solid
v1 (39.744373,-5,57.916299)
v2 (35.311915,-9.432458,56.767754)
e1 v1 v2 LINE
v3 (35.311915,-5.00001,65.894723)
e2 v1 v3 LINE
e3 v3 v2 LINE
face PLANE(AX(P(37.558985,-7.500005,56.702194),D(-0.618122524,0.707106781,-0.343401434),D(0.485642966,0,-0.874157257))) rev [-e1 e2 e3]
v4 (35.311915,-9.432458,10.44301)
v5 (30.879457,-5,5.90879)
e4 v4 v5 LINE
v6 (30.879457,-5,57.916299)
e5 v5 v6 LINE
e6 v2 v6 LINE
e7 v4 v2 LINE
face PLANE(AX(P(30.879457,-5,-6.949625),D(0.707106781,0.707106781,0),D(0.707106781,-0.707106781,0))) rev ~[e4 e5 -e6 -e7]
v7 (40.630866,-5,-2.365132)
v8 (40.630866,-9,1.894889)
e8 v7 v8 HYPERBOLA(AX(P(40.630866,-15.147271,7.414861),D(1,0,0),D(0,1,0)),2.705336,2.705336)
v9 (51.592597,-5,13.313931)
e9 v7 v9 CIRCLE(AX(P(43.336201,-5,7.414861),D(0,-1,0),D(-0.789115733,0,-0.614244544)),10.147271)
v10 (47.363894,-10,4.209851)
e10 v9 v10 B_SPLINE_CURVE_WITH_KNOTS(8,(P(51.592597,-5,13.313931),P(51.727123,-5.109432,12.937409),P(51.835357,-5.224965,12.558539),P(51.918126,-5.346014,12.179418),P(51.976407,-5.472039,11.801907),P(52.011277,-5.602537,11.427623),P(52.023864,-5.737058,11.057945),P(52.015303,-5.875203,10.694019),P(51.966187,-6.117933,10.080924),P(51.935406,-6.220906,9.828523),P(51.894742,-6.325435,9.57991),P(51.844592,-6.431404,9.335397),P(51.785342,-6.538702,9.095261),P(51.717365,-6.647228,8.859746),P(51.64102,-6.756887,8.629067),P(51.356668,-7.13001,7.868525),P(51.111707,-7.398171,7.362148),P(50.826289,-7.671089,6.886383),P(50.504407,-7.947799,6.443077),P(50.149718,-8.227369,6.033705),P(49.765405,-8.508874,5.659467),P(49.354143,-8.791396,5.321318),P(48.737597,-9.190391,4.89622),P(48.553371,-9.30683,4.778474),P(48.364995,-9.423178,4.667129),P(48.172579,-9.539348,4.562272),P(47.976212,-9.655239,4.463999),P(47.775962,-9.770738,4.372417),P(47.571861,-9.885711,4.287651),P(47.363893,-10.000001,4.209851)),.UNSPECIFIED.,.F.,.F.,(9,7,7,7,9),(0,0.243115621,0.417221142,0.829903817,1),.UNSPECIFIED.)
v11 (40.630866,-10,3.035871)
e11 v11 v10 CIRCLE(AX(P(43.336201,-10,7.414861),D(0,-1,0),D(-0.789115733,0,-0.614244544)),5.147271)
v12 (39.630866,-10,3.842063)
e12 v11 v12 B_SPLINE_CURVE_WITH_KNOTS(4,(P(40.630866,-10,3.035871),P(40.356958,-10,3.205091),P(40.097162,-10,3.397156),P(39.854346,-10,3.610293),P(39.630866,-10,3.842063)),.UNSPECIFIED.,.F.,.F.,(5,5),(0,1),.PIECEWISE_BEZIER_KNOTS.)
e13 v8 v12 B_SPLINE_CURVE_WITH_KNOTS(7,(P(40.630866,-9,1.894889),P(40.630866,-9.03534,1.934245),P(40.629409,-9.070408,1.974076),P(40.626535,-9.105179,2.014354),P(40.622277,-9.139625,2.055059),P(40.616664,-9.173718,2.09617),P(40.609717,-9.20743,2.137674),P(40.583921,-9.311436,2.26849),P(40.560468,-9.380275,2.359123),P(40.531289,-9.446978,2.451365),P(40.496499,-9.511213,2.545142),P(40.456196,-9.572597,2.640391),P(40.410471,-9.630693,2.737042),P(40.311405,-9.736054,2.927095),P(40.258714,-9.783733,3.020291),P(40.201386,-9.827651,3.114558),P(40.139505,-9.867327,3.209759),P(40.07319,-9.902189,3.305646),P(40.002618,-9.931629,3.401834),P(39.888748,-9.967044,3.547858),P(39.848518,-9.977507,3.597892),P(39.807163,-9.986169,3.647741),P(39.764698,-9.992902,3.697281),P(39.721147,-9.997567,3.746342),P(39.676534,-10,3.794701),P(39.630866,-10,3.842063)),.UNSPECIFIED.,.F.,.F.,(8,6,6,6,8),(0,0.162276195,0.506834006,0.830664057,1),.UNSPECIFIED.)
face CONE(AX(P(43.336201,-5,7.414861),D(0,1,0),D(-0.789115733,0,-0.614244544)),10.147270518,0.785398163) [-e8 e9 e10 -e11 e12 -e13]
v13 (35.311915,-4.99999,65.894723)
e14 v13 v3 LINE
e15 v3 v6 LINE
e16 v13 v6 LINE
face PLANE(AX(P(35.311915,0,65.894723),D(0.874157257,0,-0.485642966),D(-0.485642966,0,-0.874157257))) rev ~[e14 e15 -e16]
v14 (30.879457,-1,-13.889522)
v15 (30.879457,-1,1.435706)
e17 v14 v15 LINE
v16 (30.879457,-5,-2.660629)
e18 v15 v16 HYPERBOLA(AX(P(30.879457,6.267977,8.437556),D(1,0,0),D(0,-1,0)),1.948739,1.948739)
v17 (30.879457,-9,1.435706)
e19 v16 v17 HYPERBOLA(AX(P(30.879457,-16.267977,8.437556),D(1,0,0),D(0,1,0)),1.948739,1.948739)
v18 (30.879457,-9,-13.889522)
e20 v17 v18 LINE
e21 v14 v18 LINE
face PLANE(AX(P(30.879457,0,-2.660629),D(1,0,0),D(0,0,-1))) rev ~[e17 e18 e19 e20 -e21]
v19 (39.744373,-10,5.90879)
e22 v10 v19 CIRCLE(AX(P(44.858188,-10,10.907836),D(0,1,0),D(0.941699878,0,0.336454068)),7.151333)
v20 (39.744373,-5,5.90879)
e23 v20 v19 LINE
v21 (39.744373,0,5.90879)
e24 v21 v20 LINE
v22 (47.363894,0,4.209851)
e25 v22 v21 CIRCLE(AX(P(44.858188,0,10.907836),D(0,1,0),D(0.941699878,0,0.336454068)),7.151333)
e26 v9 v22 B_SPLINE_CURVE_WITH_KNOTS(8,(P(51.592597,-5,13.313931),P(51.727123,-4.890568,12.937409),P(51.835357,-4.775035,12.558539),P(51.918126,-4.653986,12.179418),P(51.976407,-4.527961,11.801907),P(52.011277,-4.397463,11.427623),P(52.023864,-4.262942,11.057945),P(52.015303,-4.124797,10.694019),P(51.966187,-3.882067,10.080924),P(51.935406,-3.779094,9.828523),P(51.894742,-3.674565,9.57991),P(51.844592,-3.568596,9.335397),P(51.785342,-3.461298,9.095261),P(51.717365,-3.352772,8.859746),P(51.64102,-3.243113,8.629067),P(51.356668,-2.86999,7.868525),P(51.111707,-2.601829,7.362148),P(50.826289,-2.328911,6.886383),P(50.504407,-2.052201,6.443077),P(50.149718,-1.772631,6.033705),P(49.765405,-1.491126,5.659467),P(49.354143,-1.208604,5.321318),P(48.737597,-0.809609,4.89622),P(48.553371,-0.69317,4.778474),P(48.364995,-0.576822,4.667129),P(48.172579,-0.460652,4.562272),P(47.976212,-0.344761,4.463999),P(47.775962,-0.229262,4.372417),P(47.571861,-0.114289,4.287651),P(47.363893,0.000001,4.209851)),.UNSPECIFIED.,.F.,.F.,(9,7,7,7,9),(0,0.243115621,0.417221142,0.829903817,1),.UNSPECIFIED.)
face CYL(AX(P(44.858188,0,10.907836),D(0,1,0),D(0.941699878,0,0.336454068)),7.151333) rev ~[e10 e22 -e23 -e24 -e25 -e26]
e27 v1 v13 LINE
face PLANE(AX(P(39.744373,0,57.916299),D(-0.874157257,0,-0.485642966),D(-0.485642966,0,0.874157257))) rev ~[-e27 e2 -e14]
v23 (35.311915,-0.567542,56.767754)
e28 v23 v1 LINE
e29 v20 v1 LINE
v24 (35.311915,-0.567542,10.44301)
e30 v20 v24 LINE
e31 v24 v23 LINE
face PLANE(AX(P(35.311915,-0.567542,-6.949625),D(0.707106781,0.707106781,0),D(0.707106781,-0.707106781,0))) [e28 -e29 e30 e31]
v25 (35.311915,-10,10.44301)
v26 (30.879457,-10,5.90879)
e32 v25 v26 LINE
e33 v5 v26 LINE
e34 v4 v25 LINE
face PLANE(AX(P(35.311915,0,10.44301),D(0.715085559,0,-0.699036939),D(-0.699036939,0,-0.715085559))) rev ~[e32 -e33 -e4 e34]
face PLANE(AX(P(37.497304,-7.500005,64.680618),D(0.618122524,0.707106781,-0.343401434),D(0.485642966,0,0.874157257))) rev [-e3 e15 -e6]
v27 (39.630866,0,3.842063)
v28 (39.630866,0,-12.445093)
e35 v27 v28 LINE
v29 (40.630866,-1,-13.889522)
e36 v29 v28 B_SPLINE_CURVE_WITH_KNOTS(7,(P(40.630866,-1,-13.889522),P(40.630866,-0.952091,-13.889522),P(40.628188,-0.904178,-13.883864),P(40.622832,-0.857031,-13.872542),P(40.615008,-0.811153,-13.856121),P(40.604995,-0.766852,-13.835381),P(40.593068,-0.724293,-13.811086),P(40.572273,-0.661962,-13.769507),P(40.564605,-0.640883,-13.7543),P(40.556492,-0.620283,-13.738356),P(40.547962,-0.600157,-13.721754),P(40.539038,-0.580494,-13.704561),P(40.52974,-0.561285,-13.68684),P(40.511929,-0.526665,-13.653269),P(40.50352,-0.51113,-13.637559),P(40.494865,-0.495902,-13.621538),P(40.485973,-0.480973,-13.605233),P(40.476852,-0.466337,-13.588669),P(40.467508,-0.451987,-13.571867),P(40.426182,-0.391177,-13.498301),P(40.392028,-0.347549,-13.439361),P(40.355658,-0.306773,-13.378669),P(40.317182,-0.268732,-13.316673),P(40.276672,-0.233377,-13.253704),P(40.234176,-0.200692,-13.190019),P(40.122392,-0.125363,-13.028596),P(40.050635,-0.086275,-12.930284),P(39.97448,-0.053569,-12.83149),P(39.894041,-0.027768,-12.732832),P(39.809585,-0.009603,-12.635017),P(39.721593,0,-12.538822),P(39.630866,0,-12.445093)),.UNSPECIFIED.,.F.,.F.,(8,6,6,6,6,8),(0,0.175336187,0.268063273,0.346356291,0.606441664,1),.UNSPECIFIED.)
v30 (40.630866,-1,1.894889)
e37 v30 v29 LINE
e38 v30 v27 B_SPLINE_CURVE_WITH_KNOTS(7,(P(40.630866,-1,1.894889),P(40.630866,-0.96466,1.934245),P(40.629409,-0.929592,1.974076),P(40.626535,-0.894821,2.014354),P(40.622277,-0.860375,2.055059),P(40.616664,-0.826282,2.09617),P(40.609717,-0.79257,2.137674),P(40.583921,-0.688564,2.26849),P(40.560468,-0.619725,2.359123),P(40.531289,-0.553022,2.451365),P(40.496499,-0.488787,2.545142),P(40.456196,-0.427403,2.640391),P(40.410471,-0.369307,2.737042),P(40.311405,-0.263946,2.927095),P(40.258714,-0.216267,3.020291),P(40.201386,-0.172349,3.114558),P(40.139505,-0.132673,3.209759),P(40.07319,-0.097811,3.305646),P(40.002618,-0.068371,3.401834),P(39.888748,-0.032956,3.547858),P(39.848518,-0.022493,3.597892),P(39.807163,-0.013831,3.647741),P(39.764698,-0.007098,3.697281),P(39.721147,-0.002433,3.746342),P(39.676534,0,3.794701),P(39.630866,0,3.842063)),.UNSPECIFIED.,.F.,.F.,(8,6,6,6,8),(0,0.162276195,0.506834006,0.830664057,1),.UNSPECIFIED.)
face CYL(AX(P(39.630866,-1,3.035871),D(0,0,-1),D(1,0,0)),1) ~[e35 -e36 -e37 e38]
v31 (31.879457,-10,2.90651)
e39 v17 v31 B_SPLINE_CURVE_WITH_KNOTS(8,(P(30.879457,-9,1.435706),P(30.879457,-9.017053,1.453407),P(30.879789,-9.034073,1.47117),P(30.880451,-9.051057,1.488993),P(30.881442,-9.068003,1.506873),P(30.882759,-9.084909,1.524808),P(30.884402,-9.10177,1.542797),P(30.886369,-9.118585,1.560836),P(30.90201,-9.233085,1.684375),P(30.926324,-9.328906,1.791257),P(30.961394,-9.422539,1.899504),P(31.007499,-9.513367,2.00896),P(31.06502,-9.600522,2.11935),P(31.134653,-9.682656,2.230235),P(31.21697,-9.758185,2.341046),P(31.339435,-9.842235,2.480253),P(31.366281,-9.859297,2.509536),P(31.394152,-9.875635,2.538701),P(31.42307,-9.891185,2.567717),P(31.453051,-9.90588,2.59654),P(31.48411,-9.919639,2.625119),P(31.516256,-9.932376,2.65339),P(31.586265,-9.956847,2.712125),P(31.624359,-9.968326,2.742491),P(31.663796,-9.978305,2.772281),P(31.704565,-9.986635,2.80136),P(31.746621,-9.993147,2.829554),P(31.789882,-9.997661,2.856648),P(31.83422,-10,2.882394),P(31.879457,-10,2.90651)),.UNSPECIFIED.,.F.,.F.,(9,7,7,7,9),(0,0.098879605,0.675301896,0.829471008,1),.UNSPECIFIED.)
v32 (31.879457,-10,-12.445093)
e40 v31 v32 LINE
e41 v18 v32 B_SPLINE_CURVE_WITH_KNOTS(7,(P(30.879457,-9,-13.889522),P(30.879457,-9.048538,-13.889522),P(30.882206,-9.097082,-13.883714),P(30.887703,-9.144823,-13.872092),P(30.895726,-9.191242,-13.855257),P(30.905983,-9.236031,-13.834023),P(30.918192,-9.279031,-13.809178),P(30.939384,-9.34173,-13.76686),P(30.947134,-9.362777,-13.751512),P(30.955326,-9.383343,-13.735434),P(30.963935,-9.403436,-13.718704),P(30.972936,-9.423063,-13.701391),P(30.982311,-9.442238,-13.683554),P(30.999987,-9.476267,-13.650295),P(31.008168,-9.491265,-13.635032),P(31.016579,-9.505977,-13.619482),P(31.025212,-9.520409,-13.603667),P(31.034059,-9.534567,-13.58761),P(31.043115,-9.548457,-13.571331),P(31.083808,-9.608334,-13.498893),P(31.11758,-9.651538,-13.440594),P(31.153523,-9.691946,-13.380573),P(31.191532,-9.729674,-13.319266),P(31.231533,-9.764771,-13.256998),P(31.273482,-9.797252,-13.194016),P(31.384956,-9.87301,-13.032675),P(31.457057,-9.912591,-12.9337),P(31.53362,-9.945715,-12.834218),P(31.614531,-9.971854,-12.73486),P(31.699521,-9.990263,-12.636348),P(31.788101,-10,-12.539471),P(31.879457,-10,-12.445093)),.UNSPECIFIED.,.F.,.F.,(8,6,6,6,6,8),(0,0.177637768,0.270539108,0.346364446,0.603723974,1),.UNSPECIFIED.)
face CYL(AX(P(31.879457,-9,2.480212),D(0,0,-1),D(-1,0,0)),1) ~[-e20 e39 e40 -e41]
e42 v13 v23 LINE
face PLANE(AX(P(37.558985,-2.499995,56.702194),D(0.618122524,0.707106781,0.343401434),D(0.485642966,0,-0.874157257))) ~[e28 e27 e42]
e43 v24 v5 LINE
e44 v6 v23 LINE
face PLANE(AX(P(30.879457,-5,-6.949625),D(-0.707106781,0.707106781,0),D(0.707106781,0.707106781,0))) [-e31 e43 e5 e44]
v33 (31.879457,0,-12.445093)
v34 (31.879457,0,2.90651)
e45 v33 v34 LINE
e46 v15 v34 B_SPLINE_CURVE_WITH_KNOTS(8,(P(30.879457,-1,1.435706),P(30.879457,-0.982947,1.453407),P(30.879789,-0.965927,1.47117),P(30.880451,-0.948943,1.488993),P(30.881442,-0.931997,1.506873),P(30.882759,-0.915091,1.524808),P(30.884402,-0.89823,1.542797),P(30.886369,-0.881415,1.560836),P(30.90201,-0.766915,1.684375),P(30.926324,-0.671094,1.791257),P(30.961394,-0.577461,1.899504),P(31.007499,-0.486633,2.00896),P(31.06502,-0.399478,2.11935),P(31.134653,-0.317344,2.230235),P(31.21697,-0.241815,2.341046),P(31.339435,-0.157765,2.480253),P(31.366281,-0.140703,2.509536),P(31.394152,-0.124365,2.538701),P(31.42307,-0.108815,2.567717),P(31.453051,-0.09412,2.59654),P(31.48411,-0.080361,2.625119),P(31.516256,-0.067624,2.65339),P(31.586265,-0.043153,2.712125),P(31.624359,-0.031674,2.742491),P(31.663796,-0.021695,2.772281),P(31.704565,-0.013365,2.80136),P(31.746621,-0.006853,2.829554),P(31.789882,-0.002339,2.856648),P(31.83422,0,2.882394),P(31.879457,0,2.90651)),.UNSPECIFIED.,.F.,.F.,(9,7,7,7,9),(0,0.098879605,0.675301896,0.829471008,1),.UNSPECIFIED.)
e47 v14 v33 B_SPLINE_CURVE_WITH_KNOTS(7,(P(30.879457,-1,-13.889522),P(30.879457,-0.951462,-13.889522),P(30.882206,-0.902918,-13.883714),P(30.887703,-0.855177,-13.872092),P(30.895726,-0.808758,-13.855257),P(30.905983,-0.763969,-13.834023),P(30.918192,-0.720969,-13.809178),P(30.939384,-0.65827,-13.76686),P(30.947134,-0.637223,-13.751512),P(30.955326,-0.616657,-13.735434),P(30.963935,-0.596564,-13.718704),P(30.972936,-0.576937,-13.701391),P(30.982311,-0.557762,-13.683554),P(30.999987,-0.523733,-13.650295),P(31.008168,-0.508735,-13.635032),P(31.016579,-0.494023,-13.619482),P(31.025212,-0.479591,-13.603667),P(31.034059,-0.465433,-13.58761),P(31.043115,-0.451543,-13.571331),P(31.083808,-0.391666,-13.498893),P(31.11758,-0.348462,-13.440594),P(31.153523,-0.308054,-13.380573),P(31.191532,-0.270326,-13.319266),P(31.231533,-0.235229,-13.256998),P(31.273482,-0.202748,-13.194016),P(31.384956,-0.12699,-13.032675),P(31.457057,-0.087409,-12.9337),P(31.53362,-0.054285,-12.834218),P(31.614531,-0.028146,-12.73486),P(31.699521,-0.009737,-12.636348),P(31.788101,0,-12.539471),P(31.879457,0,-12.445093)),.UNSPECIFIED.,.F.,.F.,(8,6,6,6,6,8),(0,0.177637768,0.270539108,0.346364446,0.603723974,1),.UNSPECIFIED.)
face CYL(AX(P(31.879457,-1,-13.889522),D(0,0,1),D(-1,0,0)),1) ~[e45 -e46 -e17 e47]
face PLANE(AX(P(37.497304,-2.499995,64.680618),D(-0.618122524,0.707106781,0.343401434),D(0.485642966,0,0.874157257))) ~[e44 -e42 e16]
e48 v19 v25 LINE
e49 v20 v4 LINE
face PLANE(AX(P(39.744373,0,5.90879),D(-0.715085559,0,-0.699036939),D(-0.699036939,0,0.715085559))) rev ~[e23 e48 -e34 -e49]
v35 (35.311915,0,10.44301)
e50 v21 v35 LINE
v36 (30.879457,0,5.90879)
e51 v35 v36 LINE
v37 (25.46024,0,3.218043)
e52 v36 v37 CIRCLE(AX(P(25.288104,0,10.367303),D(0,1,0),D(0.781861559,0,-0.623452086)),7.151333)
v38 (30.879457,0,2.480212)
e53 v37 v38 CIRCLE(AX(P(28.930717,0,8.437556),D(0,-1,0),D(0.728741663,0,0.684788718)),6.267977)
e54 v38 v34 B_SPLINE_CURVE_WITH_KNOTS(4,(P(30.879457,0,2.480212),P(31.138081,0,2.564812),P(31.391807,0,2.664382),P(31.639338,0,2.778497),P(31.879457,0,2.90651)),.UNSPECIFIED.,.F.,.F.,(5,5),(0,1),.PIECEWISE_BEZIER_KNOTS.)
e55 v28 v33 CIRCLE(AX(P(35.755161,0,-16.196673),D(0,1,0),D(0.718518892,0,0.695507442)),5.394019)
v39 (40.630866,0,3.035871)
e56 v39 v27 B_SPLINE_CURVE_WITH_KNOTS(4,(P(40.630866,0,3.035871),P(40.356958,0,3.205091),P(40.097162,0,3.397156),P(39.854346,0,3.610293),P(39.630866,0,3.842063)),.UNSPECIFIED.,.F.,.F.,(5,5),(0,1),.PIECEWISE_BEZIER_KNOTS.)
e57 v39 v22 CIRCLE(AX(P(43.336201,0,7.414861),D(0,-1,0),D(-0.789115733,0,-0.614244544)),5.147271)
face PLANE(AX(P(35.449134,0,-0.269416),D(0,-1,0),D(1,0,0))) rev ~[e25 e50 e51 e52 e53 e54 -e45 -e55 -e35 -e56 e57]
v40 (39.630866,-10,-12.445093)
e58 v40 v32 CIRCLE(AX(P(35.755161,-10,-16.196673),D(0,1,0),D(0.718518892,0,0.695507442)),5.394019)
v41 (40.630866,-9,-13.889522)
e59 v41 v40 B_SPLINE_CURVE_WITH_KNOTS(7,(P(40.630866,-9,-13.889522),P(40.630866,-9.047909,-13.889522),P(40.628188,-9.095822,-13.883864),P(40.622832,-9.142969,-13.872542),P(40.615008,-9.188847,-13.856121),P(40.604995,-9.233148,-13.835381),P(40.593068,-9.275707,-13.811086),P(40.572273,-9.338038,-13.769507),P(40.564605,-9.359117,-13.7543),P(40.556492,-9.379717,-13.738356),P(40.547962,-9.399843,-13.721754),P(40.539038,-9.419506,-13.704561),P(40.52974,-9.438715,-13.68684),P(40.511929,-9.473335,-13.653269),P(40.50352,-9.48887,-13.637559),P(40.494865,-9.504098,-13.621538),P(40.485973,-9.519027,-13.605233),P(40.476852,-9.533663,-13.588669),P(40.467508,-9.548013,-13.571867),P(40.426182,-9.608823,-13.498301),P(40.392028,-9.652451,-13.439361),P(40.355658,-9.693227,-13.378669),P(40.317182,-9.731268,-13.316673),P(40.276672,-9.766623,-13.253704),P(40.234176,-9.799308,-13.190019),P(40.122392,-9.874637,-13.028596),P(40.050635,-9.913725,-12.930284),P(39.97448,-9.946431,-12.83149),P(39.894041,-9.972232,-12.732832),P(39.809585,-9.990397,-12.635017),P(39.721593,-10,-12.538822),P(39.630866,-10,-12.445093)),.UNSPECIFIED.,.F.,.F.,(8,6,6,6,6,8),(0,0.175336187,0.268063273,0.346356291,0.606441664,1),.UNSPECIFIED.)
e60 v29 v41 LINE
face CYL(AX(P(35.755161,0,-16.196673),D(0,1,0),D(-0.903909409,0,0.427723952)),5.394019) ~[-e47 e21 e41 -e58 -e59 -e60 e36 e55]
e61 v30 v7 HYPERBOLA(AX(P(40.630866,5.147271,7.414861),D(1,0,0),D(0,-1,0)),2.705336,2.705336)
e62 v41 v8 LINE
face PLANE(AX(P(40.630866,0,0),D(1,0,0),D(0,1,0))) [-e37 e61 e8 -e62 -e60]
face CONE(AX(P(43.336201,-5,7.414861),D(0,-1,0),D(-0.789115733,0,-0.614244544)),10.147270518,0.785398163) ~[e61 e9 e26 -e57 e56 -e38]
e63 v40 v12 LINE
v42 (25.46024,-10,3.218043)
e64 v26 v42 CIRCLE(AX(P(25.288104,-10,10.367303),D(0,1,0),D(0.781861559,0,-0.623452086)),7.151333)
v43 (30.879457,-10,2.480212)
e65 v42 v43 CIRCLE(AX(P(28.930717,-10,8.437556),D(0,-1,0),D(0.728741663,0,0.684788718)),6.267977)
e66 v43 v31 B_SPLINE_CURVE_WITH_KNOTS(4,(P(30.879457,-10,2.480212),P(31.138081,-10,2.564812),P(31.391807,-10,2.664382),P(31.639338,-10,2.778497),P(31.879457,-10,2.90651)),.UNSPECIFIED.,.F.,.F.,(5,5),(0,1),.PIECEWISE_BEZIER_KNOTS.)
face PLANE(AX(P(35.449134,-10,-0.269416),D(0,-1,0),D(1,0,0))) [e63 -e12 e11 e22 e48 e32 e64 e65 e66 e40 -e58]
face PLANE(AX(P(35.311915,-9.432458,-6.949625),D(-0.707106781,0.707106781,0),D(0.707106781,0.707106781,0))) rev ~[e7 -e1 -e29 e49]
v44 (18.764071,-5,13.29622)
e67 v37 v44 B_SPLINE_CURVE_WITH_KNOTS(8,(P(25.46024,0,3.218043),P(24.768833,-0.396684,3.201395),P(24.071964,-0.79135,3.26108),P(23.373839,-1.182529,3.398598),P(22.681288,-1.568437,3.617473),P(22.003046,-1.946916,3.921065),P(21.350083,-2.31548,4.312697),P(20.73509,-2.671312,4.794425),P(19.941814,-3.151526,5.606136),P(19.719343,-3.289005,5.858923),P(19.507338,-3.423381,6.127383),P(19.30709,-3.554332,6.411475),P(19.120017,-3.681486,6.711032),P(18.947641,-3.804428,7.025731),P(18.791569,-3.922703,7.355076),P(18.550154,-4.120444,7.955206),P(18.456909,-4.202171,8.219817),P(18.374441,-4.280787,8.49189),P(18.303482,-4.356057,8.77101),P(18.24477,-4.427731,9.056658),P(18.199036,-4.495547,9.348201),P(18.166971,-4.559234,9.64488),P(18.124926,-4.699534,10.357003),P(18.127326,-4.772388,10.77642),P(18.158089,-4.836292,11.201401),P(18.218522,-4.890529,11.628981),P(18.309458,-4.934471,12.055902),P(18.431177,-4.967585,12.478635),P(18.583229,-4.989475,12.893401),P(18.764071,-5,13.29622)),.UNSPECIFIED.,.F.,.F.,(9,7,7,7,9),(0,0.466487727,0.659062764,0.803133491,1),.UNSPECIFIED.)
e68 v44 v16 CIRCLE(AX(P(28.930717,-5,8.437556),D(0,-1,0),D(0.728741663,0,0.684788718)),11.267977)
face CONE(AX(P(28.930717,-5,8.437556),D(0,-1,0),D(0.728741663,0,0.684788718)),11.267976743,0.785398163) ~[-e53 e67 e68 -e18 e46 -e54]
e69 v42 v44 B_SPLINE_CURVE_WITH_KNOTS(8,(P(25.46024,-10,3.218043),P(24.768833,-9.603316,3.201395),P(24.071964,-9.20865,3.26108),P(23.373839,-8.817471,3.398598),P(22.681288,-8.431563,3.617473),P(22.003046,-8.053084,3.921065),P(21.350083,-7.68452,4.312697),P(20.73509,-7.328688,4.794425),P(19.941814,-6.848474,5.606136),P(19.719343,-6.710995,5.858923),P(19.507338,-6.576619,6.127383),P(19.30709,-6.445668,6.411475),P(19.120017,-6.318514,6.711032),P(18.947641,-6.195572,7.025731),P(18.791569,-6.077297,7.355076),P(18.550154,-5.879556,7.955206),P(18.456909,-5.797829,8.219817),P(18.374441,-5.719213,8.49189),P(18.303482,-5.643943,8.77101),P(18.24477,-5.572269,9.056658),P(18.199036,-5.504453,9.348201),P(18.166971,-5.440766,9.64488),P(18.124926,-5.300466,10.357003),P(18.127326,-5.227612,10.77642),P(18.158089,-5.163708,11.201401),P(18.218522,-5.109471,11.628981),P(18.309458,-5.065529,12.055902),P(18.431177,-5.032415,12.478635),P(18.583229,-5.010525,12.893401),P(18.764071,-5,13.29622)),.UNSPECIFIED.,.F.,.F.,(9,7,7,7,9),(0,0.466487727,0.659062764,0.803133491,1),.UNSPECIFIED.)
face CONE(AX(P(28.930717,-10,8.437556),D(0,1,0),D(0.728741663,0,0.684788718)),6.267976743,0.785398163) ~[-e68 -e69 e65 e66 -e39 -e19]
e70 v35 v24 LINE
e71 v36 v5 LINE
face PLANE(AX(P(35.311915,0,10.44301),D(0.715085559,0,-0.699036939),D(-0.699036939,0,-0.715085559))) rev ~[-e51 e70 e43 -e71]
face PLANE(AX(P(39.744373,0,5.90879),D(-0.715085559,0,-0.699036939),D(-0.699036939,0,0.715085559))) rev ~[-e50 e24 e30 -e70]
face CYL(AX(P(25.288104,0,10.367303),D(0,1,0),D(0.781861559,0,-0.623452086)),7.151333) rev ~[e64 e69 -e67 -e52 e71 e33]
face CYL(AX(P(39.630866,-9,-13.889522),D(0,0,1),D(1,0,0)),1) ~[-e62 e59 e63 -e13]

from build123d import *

# Parameters (mm, degrees)
F1_DEPTH    = 10
F2_SIZE     = 4.99999
F3_T1_DEPTH = 67.4287295288
F4_DEPTH    = 10
F5_T4_ANGLE = 302.1740734605
F5_T9_ANGLE = 359.64
F6_T4_ANGLE = 359.64
F6_T9_ANGLE = 302.1740734605
F7_R        = 1


# Not quite as in the source:
# - a fillet or chamfer that OpenCascade refuses, or shapes differently, is made with other operations: its cross-section is extruded or revolved along the edge and cut away or added
# - a fillet or chamfer is up to 0.001 mm smaller than in the source, because OpenCascade refuses the exact size


with BuildPart() as f1:
    # F0 (on Front) → F1 (new body)
    with BuildSketch(Plane.XZ):
        Polygon((35.3119149804, 10.4430096801), (39.7443734109, 5.9087900445), (39.7443734109, 57.9162985086), (35.3119149804, 65.8947229385), (30.8794565499, 57.9162985086), (30.8794565499, 5.9087900445), align=None)
    extrude(amount=F1_DEPTH)

    # F2 (size 5 in the source; OpenCascade refuses exactly that, so slightly less here)
    f2_edges = [f1.edges().sort_by_distance(p)[0] for p in [
        (37.528144, -10, 61.905511),
        (37.528144, 0, 61.905511),
        (33.095686, -10, 61.905511),
        (33.095686, 0, 61.905511),
    ]]
    chamfer(f2_edges, length=F2_SIZE)

    # F3: chamfer of 5 on 4 edges, made by hand

    # F3_s2 → F3_t1 (cut)
    with BuildSketch(Plane.XY.offset(-6.9496248953)):
        Polygon((30.8794565499, -5), (35.8794565499, 0), (30.8794565499, 0), align=None)
        Polygon((30.8794565499, -5), (35.8794565499, -10), (30.8794565499, -10), align=None)
        Polygon((34.7443734109, -10), (39.7443734109, -5), (39.7443734109, -10), align=None)
        Polygon((34.7443734109, 0), (39.7443734109, -5), (39.7443734109, 0), align=None)
    extrude(amount=F3_T1_DEPTH, mode=Mode.SUBTRACT)

    # F0 (on Front) → F4 (join)
    with BuildSketch(Plane.XZ):
        with BuildLine():
            ThreePointArc((51.5925973184, 13.3139307646), (48.6483872163, 4.8435179428), (39.7443734109, 5.9087900445))
            Line((39.7443734109, 5.9087900445), (35.3119149804, 10.4430096801))
            Line((35.3119149804, 10.4430096801), (30.8794565499, 5.9087900445))
            ThreePointArc((30.8794565499, 5.9087900445), (21.5650677315, 4.2615226747), (18.7640711665, 13.2962195203))
            ThreePointArc((18.7640711665, 13.2962195203), (19.9563786111, 1.6237063121), (30.8794565499, -2.6606291067))
            Line((30.8794565499, -2.6606291067), (30.8794565499, -13.8895222917))
            ThreePointArc((30.8794565499, -13.8895222917), (35.755161196, -21.5906926023), (40.6308658421, -13.8895222917))
            Line((40.6308658421, -13.8895222917), (40.6308658421, -2.3651318625))
            ThreePointArc((40.6308658421, -2.3651318625), (51.65255991, 1.6006300969), (51.5925973184, 13.3139307646))
        make_face()
    extrude(amount=F4_DEPTH)

    # F5: chamfer of 5 on 2 edges, made by hand


with BuildPart() as f5_tool2:
    # F5_s3 → F5_t4 (revolve)
    with BuildSketch(Plane(origin=(9.3560149059, 0, -9.9565277283), x_dir=(0, 1, 0), z_dir=(0.6847887183, 0, -0.728741663))):
        Polygon((-10, 33.1289388428), (-5, 38.1289388428), (-10, 38.1289388428), align=None)
    revolve(axis=Axis((28.9307170955, -10, 8.4375560791), (0, -1, 0)), revolution_arc=F5_T4_ANGLE)

    split(bisect_by=Plane.YZ.offset(30.8794565499), keep=Keep.BOTTOM)


with BuildPart() as f1_1:
    add(f1.part)

    # F5_t1: cut F5_tool2
    add(f5_tool2.part, mode=Mode.SUBTRACT)


with BuildPart() as f5_tool7:
    # F5_s8 → F5_t9 (revolve)
    with BuildSketch(Plane(origin=(12.756533571, 0, -16.3882307622), x_dir=(0, 1, 0), z_dir=(-0.6142445443, 0, 0.7891157328))):
        Polygon((-5, -28.604545656), (-10, -33.604545656), (-10, -28.604545656), align=None)
    revolve(axis=Axis((43.3362013883, -10, 7.4148609054), (0, -1, 0)), revolution_arc=F5_T9_ANGLE)

    split(bisect_by=Plane.YZ.offset(40.6308658421), keep=Keep.TOP)


with BuildPart() as f1_2:
    add(f1_1.part)

    # F5_t6: cut F5_tool7
    add(f5_tool7.part, mode=Mode.SUBTRACT)

    # F6: chamfer of 5 on 2 edges, made by hand


with BuildPart() as f6_tool2:
    # F6_s3 → F6_t4 (revolve)
    with BuildSketch(Plane(origin=(12.756533571, 0, -16.3882307622), x_dir=(0, 1, 0), z_dir=(-0.6142445443, 0, 0.7891157328))):
        Polygon((-5, -28.604545656), (0, -33.604545656), (0, -28.604545656), align=None)
    revolve(axis=Axis((43.3362013883, 0, 7.4148609054), (0, -1, 0)), revolution_arc=F6_T4_ANGLE)

    split(bisect_by=Plane.YZ.offset(40.6308658421), keep=Keep.TOP)


with BuildPart() as f1_3:
    add(f1_2.part)

    # F6_t1: cut F6_tool2
    add(f6_tool2.part, mode=Mode.SUBTRACT)


with BuildPart() as f6_tool7:
    # F6_s8 → F6_t9 (revolve)
    with BuildSketch(Plane(origin=(9.3560149059, 0, -9.9565277283), x_dir=(0, 1, 0), z_dir=(0.6847887183, 0, -0.728741663))):
        Polygon((-5, 38.1289388428), (0, 33.1289388428), (0, 38.1289388428), align=None)
    revolve(axis=Axis((28.9307170955, 0, 8.4375560791), (0, -1, 0)), revolution_arc=F6_T9_ANGLE)

    split(bisect_by=Plane.YZ.offset(30.8794565499), keep=Keep.BOTTOM)


with BuildPart() as f1_4:
    add(f1_3.part)

    # F6_t6: cut F6_tool7
    add(f6_tool7.part, mode=Mode.SUBTRACT)

    # F7
    f7_edges = [f1_4.edges().sort_by_distance(p)[0] for p in [
        (40.630866, 0, -5.426826),
        (30.879457, 0, -5.704655),
        (40.630866, -10, -5.426826),
        (30.879457, -10, -5.704655),
    ]]
    fillet(f7_edges, radius=F7_R)


solid = f1_4.part
